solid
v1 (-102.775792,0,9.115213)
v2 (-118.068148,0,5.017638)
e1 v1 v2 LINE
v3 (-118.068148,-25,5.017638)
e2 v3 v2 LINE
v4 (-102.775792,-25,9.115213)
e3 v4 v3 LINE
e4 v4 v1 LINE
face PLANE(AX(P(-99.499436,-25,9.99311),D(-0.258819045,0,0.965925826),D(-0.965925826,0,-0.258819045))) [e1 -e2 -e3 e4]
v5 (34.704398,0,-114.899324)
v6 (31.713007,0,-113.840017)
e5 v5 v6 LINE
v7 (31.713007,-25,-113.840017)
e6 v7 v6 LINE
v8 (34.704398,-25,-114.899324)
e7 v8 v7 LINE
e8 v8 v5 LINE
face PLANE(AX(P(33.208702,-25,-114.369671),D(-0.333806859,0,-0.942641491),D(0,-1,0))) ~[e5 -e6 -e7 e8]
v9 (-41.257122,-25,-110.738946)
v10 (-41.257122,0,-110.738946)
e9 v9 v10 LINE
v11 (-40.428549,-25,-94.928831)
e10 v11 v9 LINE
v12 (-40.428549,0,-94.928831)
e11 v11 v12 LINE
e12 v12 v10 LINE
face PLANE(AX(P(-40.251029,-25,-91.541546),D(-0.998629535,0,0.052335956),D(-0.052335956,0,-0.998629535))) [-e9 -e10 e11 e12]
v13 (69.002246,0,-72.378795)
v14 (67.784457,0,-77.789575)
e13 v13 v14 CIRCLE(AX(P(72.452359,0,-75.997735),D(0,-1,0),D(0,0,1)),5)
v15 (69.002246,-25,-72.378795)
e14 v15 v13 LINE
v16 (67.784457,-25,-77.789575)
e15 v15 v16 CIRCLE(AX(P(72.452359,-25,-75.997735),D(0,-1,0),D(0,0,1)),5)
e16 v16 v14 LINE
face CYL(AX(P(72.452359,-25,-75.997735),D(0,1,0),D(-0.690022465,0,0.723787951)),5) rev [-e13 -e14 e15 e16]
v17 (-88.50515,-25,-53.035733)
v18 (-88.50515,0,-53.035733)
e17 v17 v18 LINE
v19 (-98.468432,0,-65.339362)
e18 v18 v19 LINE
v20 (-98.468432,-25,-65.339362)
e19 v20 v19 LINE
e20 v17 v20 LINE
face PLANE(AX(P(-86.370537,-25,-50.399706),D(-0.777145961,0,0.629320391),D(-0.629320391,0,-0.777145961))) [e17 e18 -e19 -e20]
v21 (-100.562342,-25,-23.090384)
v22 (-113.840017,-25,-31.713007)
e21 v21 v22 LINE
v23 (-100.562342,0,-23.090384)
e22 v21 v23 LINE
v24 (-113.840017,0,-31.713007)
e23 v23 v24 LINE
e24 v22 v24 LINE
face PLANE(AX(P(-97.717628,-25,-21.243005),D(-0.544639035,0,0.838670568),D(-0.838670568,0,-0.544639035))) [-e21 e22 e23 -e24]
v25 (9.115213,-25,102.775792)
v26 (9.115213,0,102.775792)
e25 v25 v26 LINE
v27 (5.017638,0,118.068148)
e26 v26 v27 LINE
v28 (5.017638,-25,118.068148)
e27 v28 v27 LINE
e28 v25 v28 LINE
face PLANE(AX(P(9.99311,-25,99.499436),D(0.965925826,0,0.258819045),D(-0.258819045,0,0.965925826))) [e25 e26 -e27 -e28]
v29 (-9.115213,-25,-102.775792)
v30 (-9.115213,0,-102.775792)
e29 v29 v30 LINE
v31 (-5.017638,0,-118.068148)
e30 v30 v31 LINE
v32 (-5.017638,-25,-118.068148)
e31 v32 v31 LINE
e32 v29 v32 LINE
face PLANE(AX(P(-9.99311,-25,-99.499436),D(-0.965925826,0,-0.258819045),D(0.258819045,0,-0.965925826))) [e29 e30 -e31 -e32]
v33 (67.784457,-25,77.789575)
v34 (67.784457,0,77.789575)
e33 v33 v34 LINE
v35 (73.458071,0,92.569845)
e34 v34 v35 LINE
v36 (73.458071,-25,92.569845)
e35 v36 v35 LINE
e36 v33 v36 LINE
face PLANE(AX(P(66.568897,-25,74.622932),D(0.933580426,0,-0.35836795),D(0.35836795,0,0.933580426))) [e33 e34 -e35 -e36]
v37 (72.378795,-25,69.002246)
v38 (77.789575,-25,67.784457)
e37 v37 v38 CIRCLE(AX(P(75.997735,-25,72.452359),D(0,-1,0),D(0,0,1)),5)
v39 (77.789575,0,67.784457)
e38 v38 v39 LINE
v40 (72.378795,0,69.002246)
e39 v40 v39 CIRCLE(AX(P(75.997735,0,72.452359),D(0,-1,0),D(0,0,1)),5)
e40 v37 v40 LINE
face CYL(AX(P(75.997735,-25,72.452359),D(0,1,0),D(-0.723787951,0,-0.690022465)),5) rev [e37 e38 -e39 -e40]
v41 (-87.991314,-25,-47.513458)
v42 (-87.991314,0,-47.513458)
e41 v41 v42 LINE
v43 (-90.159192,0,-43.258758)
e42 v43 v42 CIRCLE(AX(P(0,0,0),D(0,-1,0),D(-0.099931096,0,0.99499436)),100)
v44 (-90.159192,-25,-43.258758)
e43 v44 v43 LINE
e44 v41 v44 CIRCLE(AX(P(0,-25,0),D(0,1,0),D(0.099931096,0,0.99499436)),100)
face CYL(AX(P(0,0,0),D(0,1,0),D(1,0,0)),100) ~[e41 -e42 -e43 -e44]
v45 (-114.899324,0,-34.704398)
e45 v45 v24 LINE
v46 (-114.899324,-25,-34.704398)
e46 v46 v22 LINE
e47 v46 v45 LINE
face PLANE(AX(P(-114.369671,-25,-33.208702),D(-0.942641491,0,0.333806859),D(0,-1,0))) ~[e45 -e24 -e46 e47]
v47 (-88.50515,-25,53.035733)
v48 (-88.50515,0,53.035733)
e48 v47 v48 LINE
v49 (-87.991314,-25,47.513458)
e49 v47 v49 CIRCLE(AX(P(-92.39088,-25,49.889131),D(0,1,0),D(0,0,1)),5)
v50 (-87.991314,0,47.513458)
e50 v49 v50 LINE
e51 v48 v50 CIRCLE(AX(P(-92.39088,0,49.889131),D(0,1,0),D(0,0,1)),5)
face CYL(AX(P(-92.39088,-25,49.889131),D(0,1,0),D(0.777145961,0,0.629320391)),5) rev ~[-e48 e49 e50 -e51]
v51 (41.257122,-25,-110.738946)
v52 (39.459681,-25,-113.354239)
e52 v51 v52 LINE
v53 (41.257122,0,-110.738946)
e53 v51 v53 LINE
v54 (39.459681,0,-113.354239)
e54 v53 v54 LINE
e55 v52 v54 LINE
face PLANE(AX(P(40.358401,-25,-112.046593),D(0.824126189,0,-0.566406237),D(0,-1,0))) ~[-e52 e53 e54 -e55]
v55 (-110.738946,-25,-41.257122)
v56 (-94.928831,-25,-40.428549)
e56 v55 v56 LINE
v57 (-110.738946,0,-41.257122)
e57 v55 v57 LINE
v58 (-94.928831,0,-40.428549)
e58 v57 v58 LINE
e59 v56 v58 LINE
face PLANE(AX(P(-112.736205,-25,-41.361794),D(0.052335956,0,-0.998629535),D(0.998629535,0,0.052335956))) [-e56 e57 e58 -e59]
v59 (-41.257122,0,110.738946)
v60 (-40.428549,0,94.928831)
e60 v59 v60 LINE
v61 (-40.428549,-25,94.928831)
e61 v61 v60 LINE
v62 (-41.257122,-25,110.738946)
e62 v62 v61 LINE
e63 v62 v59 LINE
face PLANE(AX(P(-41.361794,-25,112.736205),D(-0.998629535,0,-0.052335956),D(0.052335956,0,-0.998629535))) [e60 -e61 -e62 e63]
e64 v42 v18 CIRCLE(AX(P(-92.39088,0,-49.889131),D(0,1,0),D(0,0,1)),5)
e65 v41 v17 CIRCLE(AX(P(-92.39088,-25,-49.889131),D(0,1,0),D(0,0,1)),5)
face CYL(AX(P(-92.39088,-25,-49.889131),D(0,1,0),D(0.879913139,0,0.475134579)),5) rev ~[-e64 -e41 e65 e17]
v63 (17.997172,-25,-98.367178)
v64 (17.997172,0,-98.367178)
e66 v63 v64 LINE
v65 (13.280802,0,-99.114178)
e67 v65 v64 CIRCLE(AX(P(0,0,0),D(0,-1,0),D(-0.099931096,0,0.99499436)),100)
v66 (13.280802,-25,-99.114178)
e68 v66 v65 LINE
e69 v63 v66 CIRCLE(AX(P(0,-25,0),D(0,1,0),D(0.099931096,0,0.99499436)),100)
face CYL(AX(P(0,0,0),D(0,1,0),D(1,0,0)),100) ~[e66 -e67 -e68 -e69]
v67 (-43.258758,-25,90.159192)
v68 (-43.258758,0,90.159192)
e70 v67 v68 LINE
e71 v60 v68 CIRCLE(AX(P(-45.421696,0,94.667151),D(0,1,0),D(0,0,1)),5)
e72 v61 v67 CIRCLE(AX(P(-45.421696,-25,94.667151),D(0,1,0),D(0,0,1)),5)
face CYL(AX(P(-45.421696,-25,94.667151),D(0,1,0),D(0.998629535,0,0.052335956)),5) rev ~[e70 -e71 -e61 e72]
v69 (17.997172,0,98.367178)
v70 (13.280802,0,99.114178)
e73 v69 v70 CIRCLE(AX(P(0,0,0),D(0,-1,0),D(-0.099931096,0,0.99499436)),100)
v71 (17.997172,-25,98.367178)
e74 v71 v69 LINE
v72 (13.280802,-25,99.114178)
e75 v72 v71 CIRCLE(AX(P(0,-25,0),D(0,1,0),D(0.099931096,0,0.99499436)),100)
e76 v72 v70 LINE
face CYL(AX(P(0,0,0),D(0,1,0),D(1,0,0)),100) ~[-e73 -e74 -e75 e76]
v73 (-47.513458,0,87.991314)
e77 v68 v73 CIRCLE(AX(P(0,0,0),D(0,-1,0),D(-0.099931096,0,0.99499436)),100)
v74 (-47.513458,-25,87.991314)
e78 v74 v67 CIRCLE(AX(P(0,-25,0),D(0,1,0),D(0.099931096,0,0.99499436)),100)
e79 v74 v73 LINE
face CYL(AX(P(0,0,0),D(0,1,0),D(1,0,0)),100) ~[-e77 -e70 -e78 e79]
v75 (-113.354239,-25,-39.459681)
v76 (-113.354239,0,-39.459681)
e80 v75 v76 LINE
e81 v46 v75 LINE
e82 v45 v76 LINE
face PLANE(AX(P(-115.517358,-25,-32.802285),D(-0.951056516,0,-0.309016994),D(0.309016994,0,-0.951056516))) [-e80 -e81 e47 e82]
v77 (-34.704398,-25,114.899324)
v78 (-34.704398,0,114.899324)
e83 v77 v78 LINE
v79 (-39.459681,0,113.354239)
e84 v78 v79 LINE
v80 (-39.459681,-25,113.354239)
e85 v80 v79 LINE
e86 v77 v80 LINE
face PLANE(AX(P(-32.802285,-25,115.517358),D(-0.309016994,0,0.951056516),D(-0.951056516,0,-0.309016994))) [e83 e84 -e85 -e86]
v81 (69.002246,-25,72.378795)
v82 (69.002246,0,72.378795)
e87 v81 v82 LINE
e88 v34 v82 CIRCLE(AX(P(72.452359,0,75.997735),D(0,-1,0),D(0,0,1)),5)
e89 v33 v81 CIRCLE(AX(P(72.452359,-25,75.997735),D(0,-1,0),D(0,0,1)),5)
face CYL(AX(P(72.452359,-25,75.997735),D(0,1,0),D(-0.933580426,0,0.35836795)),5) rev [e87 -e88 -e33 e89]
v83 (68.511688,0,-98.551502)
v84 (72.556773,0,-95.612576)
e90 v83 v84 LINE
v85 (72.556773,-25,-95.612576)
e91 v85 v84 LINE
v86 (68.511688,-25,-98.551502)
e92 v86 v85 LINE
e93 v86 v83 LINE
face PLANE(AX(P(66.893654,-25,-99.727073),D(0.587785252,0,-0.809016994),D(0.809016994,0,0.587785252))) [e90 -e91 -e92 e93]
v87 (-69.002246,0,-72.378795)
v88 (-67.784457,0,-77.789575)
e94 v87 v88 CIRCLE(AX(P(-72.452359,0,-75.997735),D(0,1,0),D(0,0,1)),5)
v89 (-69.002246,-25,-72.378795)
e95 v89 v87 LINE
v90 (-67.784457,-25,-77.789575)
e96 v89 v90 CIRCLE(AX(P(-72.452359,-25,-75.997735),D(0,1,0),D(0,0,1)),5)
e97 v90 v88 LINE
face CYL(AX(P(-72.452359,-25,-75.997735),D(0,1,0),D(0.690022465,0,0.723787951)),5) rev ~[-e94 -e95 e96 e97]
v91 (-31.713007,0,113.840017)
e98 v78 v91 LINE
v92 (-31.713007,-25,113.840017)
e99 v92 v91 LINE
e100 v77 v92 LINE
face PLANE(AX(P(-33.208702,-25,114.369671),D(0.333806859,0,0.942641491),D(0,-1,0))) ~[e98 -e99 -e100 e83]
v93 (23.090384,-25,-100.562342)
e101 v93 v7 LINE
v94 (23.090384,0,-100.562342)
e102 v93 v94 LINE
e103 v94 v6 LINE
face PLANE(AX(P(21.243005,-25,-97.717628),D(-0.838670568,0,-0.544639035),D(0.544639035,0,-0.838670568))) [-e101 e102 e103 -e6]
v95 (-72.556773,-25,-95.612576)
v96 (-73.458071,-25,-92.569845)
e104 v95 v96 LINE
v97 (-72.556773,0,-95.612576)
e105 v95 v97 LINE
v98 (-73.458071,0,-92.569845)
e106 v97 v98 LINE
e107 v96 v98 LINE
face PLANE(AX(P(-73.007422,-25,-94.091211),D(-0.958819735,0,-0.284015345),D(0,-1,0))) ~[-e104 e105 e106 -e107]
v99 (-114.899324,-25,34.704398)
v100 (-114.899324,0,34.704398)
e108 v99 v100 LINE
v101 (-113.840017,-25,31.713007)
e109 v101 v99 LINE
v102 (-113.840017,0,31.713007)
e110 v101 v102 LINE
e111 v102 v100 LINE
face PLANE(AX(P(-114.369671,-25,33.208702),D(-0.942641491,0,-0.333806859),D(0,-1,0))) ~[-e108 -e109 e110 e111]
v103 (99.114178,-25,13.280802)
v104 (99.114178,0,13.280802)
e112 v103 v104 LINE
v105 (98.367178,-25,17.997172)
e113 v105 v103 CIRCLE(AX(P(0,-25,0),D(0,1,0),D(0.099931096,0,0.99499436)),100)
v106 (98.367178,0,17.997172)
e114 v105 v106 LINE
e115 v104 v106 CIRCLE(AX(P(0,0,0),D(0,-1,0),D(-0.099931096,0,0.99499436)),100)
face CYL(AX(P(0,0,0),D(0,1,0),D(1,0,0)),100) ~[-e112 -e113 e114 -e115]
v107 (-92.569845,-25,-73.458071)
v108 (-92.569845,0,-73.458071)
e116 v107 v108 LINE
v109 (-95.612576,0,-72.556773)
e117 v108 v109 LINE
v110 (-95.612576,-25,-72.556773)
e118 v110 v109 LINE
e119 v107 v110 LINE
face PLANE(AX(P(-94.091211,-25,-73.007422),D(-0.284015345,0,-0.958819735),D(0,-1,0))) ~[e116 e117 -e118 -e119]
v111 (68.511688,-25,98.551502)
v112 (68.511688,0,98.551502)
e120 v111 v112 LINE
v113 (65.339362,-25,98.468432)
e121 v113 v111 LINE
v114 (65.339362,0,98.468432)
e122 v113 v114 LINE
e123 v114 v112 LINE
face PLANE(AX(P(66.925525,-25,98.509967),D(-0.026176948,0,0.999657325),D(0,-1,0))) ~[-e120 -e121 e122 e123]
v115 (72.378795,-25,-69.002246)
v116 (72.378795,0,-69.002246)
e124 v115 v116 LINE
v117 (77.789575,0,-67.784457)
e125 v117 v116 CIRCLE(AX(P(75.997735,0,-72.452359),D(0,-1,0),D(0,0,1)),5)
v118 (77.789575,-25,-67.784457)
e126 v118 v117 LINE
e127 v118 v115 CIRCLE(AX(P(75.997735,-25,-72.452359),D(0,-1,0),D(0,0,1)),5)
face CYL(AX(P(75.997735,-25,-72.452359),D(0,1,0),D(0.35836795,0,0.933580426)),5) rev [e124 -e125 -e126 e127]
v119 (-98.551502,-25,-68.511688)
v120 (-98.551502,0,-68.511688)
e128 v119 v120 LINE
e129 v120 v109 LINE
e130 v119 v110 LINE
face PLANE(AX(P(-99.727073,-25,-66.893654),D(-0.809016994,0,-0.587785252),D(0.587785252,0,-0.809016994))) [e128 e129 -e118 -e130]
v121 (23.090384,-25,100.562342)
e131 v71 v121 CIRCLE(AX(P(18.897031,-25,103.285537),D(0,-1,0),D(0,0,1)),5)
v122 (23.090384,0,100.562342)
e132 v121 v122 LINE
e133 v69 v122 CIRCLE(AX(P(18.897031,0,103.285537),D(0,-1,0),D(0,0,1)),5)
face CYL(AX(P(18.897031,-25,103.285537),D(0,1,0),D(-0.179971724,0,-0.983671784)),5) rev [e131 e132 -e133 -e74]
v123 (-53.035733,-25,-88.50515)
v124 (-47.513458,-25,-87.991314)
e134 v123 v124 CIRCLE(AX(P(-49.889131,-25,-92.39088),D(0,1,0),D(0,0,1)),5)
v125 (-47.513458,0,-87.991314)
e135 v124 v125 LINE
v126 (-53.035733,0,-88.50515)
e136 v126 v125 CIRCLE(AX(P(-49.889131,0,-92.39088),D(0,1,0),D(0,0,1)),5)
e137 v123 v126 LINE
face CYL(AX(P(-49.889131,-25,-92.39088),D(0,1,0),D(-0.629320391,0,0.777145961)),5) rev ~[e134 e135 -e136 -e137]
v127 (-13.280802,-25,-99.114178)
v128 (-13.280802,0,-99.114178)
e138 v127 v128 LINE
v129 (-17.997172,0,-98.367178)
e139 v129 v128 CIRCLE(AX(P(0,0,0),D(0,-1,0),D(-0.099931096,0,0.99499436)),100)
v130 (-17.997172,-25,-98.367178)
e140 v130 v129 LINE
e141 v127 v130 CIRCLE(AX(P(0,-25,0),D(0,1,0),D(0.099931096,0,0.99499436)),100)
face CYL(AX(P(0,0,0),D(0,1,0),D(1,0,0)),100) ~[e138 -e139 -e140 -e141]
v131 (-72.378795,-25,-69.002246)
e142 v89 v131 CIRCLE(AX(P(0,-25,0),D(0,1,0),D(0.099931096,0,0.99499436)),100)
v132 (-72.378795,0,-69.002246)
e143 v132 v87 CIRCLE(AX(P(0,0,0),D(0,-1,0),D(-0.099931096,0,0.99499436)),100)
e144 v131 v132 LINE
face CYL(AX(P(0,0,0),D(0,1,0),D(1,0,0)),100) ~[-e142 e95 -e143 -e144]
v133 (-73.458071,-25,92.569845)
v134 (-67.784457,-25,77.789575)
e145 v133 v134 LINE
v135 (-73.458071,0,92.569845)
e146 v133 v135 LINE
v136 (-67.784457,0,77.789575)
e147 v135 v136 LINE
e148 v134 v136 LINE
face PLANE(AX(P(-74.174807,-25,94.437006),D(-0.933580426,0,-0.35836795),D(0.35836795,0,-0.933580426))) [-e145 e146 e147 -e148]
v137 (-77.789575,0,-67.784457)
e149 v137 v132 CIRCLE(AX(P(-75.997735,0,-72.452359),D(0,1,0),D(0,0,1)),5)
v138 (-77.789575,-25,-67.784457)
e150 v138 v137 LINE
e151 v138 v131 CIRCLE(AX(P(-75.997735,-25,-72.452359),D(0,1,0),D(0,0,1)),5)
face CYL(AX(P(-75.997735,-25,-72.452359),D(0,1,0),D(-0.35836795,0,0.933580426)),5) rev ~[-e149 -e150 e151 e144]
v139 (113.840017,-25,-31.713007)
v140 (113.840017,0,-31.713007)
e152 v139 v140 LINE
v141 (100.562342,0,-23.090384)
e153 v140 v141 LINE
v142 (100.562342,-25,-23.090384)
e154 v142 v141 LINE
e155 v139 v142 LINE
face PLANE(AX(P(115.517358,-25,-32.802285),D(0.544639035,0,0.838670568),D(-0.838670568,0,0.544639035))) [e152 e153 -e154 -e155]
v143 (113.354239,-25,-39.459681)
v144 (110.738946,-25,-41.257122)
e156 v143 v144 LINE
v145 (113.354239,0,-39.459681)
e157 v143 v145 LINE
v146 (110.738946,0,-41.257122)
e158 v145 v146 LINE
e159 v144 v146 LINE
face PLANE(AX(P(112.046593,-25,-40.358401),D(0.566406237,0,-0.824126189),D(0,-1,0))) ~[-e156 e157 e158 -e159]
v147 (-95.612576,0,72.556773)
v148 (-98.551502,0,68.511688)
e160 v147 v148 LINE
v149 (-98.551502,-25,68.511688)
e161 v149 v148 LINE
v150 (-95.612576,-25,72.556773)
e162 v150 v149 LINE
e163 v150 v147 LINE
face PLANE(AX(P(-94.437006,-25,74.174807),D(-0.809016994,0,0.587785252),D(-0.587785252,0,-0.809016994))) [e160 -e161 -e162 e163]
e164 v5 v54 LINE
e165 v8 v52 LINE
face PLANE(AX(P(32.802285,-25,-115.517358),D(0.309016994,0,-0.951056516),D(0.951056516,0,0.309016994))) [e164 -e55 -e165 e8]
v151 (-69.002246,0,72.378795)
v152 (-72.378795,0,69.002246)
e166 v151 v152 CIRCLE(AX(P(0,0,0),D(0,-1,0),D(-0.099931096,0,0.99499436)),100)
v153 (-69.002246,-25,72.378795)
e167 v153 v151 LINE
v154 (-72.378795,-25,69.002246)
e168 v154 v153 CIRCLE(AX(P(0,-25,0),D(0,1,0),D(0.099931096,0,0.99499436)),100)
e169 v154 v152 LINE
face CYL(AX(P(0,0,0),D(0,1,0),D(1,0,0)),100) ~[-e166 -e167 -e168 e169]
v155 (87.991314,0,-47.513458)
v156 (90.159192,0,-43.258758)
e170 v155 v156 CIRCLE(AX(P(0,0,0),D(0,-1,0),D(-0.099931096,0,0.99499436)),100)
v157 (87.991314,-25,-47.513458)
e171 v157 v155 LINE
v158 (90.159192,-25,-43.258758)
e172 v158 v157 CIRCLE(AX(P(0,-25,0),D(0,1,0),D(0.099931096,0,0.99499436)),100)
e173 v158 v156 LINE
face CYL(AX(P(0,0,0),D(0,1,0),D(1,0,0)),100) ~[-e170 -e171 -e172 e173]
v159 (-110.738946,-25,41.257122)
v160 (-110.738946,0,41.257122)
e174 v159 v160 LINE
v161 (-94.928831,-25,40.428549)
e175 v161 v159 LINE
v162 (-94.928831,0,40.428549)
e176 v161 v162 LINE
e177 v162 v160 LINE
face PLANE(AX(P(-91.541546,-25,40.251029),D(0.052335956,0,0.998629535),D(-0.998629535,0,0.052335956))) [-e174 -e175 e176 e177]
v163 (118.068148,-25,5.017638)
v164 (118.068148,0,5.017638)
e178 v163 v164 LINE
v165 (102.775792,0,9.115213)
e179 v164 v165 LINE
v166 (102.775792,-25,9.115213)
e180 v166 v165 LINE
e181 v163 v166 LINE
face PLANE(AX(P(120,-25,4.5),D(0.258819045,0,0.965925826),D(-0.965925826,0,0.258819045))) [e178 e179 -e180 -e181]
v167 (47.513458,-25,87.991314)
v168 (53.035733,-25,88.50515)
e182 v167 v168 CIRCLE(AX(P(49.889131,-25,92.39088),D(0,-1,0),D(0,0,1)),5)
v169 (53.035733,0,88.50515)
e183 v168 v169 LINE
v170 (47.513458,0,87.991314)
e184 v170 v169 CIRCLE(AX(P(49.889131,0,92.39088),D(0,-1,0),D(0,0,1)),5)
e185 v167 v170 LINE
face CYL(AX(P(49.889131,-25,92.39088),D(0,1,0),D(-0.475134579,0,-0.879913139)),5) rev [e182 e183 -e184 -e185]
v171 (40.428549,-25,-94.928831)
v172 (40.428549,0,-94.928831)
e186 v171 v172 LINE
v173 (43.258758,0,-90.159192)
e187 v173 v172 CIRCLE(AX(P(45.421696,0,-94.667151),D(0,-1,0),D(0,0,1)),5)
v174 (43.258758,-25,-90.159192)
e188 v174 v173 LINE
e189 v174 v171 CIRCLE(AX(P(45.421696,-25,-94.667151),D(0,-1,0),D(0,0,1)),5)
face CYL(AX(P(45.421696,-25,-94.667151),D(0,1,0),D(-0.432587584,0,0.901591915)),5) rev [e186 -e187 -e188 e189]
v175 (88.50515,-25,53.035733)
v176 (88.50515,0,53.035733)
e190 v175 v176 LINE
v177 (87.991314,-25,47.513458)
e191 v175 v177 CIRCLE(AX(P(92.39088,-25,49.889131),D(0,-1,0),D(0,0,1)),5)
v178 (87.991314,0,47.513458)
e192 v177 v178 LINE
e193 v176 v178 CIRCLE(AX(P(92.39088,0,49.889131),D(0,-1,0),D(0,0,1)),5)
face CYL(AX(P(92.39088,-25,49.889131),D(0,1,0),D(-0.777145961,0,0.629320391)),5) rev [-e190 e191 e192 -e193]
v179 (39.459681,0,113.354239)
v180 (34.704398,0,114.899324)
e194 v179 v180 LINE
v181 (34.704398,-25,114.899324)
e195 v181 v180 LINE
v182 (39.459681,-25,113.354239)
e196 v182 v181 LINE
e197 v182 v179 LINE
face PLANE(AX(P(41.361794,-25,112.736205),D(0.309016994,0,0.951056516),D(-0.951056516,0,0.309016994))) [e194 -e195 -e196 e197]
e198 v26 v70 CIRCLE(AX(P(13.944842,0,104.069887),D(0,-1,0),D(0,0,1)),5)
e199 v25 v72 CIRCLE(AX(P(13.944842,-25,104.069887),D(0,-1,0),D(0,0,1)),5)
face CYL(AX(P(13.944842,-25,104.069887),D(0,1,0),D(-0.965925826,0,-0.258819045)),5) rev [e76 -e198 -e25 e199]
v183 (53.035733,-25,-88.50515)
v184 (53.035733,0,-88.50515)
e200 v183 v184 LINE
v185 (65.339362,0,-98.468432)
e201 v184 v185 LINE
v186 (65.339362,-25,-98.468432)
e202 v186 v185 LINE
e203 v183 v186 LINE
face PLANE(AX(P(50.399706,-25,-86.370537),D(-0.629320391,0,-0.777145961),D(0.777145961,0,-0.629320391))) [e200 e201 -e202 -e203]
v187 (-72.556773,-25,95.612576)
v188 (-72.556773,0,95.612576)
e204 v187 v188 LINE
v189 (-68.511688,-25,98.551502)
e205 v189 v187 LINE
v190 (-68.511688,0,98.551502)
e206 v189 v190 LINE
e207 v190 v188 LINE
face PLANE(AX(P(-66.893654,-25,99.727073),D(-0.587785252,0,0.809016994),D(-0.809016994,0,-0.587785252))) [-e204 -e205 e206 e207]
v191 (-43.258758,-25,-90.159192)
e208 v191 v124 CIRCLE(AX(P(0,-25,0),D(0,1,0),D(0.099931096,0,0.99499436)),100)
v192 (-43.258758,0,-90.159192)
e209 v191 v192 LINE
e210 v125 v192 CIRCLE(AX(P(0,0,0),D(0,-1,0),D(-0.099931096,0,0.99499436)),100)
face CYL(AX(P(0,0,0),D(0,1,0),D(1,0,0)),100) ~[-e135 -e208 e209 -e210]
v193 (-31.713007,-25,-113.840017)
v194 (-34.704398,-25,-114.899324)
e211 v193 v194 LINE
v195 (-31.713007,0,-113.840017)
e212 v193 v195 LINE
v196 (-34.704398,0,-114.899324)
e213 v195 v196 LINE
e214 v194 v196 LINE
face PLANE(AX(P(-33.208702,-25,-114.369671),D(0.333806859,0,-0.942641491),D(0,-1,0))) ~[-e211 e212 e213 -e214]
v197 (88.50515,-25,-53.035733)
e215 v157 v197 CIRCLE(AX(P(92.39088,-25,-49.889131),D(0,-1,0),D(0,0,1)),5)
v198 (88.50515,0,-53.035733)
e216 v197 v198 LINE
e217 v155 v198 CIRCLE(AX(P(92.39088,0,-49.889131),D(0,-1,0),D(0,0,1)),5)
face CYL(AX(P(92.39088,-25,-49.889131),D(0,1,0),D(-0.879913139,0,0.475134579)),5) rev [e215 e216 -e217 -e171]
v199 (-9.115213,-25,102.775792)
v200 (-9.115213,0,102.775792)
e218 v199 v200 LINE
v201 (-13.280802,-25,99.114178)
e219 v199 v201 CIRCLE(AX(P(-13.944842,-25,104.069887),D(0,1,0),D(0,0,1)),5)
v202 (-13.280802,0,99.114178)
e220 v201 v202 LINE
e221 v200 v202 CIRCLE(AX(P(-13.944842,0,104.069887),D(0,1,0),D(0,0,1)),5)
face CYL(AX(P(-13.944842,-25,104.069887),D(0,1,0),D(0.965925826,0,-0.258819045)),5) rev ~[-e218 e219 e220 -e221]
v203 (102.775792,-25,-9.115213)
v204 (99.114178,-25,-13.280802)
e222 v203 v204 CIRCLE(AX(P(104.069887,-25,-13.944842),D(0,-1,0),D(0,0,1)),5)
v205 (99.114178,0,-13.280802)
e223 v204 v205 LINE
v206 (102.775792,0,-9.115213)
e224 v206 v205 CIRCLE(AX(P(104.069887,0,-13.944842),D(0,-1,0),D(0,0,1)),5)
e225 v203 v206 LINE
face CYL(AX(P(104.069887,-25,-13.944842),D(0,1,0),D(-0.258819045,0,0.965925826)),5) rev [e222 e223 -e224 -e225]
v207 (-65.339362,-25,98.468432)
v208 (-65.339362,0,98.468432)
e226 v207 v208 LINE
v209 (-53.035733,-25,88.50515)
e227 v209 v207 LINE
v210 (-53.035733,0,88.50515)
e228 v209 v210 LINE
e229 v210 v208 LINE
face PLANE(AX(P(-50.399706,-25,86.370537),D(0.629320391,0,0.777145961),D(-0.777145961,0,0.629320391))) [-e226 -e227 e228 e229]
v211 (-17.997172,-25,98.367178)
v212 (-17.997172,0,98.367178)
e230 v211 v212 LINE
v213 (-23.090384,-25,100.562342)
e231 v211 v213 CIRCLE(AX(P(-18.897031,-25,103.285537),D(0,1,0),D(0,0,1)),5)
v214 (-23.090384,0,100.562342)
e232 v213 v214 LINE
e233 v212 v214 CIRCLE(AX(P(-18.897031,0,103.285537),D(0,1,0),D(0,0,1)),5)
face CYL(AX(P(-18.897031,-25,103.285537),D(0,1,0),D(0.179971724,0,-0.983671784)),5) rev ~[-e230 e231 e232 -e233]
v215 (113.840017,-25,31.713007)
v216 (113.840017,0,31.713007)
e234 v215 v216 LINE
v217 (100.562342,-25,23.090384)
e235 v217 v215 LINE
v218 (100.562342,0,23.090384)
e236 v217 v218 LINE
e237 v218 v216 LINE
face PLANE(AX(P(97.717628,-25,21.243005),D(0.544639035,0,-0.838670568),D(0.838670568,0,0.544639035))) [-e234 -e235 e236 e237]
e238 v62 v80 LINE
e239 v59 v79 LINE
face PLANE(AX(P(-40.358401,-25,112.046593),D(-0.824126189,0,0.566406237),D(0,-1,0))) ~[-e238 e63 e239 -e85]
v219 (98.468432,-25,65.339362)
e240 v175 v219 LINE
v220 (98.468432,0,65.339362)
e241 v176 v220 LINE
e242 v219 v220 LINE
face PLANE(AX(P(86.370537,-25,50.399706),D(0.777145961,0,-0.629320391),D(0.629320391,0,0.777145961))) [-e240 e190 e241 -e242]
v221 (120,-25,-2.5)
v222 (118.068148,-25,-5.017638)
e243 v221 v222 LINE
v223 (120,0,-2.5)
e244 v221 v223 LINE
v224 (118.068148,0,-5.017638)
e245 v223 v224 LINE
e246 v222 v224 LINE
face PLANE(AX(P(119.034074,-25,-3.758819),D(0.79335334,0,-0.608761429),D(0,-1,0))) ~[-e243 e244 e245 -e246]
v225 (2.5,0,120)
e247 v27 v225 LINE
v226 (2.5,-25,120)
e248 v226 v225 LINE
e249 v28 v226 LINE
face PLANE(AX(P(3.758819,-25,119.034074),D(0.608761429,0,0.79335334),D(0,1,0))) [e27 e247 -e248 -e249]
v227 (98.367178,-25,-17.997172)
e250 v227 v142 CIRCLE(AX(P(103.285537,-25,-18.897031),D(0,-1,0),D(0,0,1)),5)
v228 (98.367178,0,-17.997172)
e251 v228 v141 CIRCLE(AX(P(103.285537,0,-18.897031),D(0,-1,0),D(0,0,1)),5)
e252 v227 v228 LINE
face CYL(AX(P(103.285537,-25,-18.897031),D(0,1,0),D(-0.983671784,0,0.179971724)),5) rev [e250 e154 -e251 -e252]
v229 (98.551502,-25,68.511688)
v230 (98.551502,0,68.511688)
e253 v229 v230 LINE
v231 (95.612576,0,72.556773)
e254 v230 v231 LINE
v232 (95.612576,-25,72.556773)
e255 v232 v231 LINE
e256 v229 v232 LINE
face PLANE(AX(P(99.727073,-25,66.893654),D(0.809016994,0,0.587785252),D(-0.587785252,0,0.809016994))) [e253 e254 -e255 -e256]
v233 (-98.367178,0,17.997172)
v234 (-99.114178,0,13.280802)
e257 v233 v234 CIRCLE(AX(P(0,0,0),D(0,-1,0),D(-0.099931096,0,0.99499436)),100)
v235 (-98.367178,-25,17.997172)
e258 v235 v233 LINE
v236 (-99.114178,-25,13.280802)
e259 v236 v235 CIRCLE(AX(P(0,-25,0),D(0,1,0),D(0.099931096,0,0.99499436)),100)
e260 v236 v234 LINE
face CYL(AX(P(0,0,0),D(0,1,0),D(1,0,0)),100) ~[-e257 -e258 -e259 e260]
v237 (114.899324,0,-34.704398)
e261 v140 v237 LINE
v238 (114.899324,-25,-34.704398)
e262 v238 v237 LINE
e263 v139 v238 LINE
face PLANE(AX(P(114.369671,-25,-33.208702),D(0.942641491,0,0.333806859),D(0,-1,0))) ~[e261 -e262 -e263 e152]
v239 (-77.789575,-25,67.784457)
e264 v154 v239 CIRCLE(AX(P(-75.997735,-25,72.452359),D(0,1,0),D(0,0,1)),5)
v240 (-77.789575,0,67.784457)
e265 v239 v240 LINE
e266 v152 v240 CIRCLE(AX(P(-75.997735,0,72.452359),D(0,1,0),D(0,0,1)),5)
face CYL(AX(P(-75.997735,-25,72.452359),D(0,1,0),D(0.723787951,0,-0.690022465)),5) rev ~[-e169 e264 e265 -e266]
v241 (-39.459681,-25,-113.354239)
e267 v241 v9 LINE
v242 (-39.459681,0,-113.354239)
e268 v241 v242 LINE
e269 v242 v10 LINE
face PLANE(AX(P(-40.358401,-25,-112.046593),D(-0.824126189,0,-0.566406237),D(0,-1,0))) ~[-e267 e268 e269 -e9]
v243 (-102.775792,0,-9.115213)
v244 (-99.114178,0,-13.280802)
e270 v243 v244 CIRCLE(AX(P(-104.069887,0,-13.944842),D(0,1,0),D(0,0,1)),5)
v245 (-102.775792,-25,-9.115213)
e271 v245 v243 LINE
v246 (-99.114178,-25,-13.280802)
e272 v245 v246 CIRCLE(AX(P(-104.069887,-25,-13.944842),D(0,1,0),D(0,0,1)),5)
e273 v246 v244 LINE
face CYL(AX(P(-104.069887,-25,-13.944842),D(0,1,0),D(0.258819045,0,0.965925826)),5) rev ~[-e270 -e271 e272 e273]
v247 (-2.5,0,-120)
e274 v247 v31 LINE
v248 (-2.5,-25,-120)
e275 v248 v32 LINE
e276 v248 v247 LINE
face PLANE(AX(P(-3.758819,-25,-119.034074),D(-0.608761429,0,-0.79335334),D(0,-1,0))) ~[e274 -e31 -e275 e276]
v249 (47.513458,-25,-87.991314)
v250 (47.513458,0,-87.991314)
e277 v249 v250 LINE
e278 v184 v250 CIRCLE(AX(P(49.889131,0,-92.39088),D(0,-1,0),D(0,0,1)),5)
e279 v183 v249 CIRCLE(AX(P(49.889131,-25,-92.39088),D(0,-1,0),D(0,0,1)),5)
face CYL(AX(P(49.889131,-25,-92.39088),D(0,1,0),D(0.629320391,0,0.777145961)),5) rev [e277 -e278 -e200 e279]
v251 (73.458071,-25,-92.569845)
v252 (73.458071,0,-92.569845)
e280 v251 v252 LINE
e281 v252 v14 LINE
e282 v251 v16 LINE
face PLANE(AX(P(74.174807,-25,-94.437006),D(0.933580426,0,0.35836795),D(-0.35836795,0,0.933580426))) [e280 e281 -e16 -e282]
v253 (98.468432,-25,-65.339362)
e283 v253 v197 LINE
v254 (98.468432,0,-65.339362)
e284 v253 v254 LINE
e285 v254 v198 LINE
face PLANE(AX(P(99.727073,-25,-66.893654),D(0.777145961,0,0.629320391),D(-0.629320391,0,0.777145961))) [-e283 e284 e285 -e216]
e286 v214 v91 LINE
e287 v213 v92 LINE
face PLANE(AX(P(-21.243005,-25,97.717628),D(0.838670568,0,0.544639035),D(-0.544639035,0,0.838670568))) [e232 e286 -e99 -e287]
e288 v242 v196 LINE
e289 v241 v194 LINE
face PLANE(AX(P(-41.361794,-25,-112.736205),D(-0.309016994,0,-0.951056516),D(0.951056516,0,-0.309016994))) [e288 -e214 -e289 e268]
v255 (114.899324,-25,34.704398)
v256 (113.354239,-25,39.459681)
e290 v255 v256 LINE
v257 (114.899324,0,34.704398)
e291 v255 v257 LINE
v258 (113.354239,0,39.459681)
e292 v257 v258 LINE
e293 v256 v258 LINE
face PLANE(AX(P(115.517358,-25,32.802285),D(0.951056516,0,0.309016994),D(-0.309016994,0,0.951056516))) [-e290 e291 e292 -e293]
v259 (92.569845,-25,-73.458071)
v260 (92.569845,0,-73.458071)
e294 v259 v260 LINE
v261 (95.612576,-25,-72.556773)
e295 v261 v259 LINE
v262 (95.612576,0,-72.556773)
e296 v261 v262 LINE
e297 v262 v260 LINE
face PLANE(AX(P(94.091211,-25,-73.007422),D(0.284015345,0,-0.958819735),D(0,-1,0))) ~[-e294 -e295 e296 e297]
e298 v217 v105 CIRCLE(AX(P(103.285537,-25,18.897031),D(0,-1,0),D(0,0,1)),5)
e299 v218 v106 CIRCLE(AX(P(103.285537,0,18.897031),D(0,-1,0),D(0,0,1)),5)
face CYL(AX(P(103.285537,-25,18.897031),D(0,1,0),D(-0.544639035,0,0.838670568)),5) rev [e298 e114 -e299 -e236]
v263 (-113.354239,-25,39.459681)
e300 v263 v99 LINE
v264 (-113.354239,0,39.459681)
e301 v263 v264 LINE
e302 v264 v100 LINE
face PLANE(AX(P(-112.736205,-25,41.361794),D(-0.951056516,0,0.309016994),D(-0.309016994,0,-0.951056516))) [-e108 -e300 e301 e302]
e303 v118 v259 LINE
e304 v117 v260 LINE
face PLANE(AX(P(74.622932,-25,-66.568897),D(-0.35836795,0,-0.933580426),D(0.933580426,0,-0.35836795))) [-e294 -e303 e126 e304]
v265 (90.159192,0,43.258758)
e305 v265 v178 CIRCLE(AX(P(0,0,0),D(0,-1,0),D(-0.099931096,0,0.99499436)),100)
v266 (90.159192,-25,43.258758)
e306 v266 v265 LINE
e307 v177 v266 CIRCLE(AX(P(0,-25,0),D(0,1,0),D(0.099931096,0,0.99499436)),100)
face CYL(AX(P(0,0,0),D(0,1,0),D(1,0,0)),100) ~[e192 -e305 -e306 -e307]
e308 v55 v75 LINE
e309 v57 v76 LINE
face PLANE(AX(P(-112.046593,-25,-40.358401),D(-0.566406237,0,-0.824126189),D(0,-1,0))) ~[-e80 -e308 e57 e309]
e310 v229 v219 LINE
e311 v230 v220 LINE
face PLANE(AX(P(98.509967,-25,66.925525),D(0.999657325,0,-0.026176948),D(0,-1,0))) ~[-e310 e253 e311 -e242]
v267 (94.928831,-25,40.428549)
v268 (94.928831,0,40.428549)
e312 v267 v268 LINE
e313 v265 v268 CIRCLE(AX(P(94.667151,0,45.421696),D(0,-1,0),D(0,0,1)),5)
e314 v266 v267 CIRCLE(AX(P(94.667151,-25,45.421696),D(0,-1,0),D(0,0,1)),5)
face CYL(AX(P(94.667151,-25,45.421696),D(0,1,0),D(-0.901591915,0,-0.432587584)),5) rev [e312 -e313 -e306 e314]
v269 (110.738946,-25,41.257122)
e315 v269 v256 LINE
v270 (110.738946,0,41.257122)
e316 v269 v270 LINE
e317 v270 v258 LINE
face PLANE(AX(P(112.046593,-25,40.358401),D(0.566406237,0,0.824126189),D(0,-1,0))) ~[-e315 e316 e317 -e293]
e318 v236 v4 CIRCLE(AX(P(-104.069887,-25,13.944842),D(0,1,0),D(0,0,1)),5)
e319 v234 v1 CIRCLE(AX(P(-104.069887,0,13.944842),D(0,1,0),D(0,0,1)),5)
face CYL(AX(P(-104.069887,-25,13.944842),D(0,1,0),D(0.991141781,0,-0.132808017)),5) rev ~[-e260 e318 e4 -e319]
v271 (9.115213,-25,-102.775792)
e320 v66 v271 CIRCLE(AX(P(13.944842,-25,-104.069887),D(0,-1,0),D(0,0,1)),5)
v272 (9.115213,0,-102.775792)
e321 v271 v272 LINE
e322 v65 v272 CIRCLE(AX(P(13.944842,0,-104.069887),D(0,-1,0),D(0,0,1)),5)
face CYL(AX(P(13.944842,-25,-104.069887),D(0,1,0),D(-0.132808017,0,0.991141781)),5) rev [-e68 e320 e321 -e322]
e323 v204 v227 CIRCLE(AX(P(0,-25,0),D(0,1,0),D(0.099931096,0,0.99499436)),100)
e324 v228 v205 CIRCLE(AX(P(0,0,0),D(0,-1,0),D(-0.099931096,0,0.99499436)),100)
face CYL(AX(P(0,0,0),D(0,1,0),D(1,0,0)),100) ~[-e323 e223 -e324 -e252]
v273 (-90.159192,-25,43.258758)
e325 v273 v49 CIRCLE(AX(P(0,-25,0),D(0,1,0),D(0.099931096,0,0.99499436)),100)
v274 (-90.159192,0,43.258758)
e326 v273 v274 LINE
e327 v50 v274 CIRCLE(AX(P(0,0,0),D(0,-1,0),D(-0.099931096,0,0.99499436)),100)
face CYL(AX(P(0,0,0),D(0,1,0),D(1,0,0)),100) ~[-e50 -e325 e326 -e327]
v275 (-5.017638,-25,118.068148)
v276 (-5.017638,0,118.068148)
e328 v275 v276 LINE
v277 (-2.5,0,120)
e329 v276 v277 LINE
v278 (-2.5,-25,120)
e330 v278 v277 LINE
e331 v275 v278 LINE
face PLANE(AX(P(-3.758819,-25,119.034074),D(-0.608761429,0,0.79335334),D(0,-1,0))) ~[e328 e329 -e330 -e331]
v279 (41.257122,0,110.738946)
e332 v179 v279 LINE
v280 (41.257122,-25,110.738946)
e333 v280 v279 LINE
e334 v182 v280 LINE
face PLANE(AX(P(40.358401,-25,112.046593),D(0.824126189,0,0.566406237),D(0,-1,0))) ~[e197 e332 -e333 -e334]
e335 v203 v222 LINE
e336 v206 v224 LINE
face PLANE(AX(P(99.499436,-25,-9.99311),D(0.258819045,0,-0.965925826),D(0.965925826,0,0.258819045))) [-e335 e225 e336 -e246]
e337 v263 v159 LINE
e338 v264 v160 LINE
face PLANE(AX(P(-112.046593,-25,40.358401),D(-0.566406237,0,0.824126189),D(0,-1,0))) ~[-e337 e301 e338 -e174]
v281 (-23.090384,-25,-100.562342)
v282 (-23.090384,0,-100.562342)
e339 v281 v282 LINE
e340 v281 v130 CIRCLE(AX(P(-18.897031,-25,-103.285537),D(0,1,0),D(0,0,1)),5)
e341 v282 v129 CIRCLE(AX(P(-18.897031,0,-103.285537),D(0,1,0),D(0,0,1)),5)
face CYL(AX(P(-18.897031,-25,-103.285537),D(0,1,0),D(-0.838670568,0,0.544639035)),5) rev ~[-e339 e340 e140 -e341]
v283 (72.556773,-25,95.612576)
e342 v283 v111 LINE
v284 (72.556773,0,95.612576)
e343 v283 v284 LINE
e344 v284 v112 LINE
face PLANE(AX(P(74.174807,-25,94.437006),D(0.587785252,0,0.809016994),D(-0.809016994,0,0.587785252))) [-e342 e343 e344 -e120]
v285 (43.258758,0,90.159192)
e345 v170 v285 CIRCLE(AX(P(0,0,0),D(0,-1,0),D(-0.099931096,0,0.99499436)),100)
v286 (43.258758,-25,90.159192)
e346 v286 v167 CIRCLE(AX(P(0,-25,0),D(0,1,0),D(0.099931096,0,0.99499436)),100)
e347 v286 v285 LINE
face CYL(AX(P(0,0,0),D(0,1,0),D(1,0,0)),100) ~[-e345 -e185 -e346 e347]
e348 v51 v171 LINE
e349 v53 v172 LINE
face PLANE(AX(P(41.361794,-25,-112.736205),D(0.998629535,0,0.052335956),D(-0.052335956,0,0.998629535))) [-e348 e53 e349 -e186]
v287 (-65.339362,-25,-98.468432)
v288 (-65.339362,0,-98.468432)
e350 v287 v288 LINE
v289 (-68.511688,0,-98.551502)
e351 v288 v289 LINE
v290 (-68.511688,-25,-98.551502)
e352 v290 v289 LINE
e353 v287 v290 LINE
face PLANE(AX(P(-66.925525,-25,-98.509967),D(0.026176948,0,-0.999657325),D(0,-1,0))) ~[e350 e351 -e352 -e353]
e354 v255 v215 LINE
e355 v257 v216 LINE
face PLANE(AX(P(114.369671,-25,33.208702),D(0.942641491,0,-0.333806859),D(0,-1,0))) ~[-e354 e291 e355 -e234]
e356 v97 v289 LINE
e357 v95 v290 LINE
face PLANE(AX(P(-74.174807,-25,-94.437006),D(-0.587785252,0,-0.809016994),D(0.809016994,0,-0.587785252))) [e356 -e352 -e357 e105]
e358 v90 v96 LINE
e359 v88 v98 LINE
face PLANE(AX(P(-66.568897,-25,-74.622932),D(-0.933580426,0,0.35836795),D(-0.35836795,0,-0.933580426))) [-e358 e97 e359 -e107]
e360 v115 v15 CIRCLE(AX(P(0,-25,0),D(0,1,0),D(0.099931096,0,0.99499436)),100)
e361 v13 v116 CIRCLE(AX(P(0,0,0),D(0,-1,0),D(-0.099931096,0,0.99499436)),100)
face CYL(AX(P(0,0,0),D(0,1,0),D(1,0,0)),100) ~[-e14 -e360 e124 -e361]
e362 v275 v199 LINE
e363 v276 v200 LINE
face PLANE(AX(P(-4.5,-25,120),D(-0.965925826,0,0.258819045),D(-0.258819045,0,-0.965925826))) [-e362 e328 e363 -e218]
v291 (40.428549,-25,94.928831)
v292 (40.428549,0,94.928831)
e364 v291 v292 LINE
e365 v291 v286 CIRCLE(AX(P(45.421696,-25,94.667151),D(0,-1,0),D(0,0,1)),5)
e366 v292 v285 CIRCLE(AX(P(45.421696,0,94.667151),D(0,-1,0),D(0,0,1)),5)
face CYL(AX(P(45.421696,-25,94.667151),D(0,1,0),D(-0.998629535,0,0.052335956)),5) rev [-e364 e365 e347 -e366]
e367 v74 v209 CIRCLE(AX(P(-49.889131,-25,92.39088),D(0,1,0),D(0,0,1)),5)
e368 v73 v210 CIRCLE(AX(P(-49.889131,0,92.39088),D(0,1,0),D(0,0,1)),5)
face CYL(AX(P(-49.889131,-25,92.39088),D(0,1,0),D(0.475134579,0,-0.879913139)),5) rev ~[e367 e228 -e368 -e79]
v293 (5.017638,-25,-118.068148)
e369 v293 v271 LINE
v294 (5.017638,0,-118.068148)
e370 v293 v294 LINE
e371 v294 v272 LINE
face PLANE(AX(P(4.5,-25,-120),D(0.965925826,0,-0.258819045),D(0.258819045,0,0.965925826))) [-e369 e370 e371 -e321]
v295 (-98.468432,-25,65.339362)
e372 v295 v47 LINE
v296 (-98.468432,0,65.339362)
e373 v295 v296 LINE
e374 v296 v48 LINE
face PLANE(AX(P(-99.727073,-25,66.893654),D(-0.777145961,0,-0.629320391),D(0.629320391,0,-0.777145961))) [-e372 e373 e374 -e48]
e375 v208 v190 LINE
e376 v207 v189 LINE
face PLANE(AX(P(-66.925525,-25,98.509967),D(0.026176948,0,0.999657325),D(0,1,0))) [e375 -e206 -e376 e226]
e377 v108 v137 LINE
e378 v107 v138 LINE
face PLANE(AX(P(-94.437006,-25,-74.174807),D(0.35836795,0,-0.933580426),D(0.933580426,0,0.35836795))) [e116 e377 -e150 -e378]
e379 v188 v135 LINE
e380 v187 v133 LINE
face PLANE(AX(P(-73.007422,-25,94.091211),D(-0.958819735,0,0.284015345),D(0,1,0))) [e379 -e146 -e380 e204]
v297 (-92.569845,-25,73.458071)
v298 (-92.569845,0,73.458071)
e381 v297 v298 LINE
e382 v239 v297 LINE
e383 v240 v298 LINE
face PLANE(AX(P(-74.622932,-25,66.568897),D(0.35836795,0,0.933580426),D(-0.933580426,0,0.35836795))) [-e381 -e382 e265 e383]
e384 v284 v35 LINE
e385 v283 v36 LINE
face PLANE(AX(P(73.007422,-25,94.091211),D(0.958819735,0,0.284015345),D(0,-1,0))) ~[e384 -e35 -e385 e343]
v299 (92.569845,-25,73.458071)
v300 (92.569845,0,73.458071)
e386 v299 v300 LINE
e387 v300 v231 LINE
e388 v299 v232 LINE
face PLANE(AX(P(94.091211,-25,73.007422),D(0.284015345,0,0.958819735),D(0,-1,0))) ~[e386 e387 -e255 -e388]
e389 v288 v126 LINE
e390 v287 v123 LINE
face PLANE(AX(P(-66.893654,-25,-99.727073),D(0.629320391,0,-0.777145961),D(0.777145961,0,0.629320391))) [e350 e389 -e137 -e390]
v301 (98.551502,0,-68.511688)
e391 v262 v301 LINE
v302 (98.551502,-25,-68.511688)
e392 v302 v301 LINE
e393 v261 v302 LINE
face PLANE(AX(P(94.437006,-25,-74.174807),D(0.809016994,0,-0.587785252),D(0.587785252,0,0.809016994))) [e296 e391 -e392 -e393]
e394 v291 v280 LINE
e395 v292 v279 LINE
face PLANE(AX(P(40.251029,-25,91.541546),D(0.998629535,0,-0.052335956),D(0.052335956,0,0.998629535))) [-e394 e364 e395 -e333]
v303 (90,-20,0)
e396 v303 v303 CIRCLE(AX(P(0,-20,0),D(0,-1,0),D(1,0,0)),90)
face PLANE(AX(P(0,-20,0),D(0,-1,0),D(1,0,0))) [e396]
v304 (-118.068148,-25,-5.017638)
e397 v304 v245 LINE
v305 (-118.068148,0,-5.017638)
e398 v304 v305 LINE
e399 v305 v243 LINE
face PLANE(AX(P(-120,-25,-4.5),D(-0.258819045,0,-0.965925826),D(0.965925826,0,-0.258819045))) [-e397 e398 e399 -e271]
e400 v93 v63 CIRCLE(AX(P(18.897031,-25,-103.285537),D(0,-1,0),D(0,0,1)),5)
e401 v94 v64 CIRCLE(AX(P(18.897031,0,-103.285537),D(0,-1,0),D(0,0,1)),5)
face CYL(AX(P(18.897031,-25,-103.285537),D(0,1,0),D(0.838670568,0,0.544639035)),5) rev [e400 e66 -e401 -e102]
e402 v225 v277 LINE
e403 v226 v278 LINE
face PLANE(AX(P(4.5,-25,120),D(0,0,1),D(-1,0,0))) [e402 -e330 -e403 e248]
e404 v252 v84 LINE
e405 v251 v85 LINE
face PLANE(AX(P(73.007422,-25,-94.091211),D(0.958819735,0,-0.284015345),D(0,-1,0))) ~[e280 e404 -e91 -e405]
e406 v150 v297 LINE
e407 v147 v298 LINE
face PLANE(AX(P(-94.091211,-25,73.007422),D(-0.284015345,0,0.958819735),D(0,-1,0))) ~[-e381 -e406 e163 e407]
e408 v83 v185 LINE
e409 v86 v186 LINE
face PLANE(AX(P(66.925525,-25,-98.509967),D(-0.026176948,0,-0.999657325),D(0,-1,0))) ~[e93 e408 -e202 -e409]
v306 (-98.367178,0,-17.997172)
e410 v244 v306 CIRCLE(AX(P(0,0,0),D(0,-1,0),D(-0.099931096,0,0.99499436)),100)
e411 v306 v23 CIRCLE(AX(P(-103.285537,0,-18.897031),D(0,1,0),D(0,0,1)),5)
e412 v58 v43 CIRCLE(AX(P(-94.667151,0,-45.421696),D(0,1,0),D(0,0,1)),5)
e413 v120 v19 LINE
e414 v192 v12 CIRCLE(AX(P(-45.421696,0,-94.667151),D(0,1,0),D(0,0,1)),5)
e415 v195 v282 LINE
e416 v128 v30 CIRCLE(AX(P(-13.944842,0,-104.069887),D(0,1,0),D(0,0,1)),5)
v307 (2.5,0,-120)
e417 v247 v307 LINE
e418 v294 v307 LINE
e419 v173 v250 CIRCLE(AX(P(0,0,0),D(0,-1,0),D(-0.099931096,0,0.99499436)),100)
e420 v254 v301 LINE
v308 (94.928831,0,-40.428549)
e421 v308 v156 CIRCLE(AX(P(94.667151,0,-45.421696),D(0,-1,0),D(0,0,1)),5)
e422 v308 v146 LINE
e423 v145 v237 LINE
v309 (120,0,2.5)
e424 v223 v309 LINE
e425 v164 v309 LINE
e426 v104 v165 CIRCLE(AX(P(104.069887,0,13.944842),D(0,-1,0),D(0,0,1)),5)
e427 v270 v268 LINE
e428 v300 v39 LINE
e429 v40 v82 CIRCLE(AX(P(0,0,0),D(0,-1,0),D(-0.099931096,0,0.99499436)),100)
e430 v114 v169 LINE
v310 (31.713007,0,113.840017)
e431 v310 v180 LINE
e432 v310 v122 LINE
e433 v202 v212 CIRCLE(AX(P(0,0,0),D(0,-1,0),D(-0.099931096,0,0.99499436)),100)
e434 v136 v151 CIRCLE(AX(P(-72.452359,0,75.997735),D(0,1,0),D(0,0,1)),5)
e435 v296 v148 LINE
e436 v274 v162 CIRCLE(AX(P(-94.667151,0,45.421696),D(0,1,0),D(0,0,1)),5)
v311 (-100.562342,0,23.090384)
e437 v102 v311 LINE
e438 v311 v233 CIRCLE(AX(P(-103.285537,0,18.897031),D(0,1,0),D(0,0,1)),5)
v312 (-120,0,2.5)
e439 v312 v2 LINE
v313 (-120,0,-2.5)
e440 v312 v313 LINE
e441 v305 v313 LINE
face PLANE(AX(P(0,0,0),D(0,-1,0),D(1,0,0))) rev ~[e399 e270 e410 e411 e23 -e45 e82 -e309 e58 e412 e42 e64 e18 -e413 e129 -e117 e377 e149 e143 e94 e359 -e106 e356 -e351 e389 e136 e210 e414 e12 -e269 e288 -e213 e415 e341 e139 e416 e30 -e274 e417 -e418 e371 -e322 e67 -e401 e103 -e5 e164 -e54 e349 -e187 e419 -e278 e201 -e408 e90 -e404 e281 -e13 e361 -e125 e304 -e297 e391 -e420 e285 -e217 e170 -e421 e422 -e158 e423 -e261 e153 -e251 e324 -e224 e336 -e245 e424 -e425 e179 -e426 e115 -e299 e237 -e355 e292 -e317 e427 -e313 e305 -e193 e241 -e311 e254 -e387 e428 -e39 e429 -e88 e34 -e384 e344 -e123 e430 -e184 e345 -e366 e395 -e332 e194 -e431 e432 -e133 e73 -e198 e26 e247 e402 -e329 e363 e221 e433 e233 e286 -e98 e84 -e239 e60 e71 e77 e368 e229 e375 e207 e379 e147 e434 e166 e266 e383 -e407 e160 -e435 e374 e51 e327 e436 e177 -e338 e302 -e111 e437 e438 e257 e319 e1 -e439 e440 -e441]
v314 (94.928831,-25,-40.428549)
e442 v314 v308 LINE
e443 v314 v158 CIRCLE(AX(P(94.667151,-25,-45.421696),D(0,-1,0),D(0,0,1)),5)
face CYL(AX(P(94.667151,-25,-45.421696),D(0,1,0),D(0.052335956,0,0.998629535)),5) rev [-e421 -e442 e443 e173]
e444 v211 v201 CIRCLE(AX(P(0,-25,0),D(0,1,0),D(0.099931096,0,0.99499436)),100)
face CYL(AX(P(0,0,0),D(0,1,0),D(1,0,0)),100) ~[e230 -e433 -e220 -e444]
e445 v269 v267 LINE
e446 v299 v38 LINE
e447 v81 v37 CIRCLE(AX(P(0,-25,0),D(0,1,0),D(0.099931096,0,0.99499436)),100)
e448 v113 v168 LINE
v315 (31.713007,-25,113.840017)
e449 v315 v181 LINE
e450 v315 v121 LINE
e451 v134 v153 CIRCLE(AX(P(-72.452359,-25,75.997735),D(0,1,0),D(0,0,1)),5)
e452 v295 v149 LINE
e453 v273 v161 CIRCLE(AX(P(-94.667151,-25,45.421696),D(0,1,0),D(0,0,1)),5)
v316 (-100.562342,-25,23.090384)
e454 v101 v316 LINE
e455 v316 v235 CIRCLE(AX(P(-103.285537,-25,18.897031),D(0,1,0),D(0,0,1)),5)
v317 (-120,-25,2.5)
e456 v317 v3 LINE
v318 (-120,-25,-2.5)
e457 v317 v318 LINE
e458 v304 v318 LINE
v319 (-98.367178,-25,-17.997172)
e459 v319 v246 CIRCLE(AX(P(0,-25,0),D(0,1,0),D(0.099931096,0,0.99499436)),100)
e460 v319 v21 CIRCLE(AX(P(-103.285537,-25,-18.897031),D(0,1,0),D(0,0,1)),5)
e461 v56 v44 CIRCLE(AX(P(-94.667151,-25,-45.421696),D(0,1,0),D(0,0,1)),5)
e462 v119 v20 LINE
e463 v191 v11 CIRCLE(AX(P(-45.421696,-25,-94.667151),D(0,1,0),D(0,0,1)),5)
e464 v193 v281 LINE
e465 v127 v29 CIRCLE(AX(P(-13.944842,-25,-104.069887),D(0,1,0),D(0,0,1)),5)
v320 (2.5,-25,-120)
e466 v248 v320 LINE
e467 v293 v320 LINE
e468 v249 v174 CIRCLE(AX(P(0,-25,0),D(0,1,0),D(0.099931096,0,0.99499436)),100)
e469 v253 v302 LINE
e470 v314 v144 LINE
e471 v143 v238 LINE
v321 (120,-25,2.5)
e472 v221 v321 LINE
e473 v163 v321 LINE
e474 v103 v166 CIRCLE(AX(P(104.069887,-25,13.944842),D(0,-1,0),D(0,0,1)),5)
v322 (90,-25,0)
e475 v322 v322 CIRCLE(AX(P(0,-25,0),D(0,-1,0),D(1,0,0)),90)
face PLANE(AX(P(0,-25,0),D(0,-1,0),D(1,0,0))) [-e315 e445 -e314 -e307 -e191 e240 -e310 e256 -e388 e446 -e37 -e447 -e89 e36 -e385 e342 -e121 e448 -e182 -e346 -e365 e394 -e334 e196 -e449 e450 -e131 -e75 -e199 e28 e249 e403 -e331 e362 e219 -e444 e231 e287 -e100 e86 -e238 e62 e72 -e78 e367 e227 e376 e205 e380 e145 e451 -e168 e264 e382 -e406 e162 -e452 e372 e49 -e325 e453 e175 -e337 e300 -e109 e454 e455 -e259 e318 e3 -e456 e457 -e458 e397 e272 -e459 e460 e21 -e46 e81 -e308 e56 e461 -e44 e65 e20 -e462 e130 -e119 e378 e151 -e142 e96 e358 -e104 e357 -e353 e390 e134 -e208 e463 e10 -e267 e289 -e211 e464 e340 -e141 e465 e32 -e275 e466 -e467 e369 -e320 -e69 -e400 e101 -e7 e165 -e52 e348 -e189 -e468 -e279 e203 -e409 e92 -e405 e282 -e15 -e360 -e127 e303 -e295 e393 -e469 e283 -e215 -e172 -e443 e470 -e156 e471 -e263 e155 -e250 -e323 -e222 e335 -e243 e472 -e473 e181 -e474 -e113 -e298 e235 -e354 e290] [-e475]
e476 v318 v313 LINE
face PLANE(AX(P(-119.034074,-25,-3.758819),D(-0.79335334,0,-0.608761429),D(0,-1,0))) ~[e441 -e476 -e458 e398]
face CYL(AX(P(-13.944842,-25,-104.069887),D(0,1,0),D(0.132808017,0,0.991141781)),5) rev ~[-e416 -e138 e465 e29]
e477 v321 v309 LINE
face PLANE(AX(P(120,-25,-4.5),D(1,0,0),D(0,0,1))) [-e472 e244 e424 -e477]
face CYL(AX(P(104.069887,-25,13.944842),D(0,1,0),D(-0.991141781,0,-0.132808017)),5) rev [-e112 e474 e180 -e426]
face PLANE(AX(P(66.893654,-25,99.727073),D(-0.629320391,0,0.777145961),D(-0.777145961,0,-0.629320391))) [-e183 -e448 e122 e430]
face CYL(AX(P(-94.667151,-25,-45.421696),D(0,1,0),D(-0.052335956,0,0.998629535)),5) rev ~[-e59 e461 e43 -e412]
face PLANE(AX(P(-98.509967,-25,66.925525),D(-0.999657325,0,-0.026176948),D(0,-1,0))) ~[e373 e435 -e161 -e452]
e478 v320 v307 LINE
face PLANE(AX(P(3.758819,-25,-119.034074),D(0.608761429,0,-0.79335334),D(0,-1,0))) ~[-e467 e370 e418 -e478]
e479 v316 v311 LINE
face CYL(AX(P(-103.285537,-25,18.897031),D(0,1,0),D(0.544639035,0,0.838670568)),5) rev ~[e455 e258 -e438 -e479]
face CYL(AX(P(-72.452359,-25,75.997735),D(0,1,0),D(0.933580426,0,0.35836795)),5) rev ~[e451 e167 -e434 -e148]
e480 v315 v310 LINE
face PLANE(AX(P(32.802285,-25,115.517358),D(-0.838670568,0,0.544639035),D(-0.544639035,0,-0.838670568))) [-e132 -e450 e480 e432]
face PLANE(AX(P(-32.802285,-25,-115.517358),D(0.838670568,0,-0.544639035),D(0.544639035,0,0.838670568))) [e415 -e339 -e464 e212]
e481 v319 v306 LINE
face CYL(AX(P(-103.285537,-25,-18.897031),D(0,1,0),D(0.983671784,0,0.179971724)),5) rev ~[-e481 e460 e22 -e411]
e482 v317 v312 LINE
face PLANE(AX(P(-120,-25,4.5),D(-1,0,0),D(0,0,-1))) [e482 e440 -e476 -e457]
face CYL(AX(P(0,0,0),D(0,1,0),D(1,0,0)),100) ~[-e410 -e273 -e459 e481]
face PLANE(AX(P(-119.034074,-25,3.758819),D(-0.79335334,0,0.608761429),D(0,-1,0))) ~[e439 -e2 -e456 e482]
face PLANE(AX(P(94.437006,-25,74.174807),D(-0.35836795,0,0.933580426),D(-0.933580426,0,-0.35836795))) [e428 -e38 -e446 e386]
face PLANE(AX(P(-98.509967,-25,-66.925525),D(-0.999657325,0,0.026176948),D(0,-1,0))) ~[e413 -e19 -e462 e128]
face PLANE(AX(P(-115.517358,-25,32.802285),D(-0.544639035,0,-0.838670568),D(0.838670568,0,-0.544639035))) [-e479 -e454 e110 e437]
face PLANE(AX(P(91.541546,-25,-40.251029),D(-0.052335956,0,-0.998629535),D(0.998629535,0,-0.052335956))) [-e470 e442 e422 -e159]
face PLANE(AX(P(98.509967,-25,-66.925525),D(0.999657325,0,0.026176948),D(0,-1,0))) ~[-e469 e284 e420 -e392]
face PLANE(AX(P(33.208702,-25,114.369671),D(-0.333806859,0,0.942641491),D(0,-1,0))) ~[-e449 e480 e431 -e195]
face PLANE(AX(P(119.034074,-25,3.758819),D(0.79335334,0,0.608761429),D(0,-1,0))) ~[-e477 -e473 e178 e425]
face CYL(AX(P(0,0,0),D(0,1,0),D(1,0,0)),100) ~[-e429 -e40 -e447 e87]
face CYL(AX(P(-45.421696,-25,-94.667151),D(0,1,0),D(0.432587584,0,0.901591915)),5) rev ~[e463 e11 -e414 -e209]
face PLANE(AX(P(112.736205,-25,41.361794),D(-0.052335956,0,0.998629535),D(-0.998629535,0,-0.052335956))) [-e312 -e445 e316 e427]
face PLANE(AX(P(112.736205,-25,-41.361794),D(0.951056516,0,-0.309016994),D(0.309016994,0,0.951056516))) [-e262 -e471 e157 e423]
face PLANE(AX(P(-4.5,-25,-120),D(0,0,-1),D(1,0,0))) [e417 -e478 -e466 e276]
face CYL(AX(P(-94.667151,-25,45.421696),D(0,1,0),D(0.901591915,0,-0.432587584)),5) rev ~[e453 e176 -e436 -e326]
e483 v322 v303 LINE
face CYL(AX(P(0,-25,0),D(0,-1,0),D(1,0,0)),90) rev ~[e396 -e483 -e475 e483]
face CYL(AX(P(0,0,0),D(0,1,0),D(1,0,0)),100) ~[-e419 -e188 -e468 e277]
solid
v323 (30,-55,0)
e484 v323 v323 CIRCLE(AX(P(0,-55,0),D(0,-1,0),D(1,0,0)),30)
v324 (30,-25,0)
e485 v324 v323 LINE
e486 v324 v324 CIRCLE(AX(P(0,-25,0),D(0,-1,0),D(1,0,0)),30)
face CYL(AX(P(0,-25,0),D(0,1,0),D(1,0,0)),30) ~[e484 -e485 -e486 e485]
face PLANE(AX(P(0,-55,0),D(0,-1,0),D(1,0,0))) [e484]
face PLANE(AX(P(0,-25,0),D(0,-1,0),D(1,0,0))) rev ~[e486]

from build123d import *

# Parameters (mm, degrees)
F0_R            = 100
F1_DEPTH        = 25
F3_DEPTH        = 25
F3_COPIES_COUNT = 20
F4_SIZE         = 2
F5_R            = 5
F6_R            = 90
F7_DEPTH        = 5
F8_R            = 30
F9_DEPTH        = 30


# Not quite as in the source:
# - a pattern or mirror of a feature is missing from the dataset's text; its kind, count and spacing are read off the source's solid


with BuildPart() as f1:
    # F0 (on Front) → F1 (new body)
    with BuildSketch(Plane.XZ):
        Circle(F0_R)
    extrude(amount=F1_DEPTH)

    # F2 (on face) → F3 (join)
    with BuildSketch(Plane.XZ.offset(25)):
        with BuildLine():
            Line((9.9931095726, 99.4994359837), (-9.9931095726, 99.4994359837))
            ThreePointArc((-9.9931095726, 99.4994359837), (-67.0846071865, -74.159662072), (100, 0))
            ThreePointArc((100, 0), (74.159662072, 67.0846071865), (9.9931095726, 99.4994359837))
        make_face()
        with BuildLine():
            Line((-4.5, 120), (-9.9931095726, 99.4994359837))
            ThreePointArc((-9.9931095726, 99.4994359837), (0, 100), (9.9931095726, 99.4994359837))
            Line((9.9931095726, 99.4994359837), (4.5, 120))
            Line((4.5, 120), (-4.5, 120))
        make_face()
    f3 = extrude(amount=-F3_DEPTH)

    # F3_copies: F3 ×20 about axis
    f3_copies_axis = Axis((0, 0, 0), (0, 1, 0))
    for i in range(1, F3_COPIES_COUNT):
        add(f3.rotate(f3_copies_axis, i * 360 / F3_COPIES_COUNT))

    # F4
    f4_edges = [f1.edges().sort_by_distance(p)[0] for p in [
        (-4.5, -12.5, 120),
        (4.5, -12.5, 120),
        (-41.361794, -12.5, 112.736205),
        (-66.893654, -12.5, 99.727073),
        (-32.802285, -12.5, 115.517358),
        (-74.174807, -12.5, 94.437006),
        (32.802285, -12.5, 115.517358),
        (41.361794, -12.5, 112.736205),
        (66.893654, -12.5, 99.727073),
        (74.174807, -12.5, 94.437006),
        (94.437006, -12.5, 74.174807),
        (99.727073, -12.5, 66.893654),
        (112.736205, -12.5, 41.361794),
        (115.517358, -12.5, 32.802285),
        (120, -12.5, 4.5),
        (120, -12.5, -4.5),
        (115.517358, -12.5, -32.802285),
        (112.736205, -12.5, -41.361794),
        (99.727073, -12.5, -66.893654),
        (94.437006, -12.5, -74.174807),
        (74.174807, -12.5, -94.437006),
        (66.893654, -12.5, -99.727073),
        (41.361794, -12.5, -112.736205),
        (32.802285, -12.5, -115.517358),
        (4.5, -12.5, -120),
        (-4.5, -12.5, -120),
        (-32.802285, -12.5, -115.517358),
        (-41.361794, -12.5, -112.736205),
        (-66.893654, -12.5, -99.727073),
        (-74.174807, -12.5, -94.437006),
        (-94.437006, -12.5, -74.174807),
        (-99.727073, -12.5, -66.893654),
        (-112.736205, -12.5, -41.361794),
        (-115.517358, -12.5, -32.802285),
        (-120, -12.5, -4.5),
        (-120, -12.5, 4.5),
        (-115.517358, -12.5, 32.802285),
        (-112.736205, -12.5, 41.361794),
        (-99.727073, -12.5, 66.893654),
        (-94.437006, -12.5, 74.174807),
    ]]
    chamfer(f4_edges, length=F4_SIZE)

    # F5
    f5_edges = [f1.edges().sort_by_distance(p)[0] for p in [
        (9.99311, -12.5, 99.499436),
        (-9.99311, -12.5, 99.499436),
        (21.243005, -12.5, 97.717628),
        (-21.243005, -12.5, 97.717628),
        (40.251029, -12.5, 91.541546),
        (50.399706, -12.5, 86.370537),
        (-40.251029, -12.5, 91.541546),
        (-50.399706, -12.5, 86.370537),
        (66.568897, -12.5, 74.622932),
        (74.622932, -12.5, 66.568897),
        (-66.568897, -12.5, 74.622932),
        (-74.622932, -12.5, 66.568897),
        (86.370537, -12.5, 50.399706),
        (91.541546, -12.5, 40.251029),
        (-86.370537, -12.5, 50.399706),
        (-91.541546, -12.5, 40.251029),
        (97.717628, -12.5, 21.243005),
        (99.499436, -12.5, 9.99311),
        (-97.717628, -12.5, 21.243005),
        (-99.499436, -12.5, 9.99311),
        (99.499436, -12.5, -9.99311),
        (97.717628, -12.5, -21.243005),
        (-99.499436, -12.5, -9.99311),
        (-97.717628, -12.5, -21.243005),
        (91.541546, -12.5, -40.251029),
        (86.370537, -12.5, -50.399706),
        (-91.541546, -12.5, -40.251029),
        (-86.370537, -12.5, -50.399706),
        (74.622932, -12.5, -66.568897),
        (66.568897, -12.5, -74.622932),
        (-74.622932, -12.5, -66.568897),
        (-66.568897, -12.5, -74.622932),
        (50.399706, -12.5, -86.370537),
        (40.251029, -12.5, -91.541546),
        (-50.399706, -12.5, -86.370537),
        (-40.251029, -12.5, -91.541546),
        (21.243005, -12.5, -97.717628),
        (9.99311, -12.5, -99.499436),
        (-21.243005, -12.5, -97.717628),
        (-9.99311, -12.5, -99.499436),
    ]]
    fillet(f5_edges, radius=F5_R)

    # F6 (on face) → F7 (cut)
    with BuildSketch(Plane.XZ.offset(25)):
        Circle(F6_R)
    extrude(amount=-F7_DEPTH, mode=Mode.SUBTRACT)


with BuildPart() as f9:
    # F8 (on face) → F9 (new body)
    with BuildSketch(Plane.XZ.offset(25)):
        Circle(F8_R)
    extrude(amount=F9_DEPTH)


solid = Compound([f1.part, f9.part])
